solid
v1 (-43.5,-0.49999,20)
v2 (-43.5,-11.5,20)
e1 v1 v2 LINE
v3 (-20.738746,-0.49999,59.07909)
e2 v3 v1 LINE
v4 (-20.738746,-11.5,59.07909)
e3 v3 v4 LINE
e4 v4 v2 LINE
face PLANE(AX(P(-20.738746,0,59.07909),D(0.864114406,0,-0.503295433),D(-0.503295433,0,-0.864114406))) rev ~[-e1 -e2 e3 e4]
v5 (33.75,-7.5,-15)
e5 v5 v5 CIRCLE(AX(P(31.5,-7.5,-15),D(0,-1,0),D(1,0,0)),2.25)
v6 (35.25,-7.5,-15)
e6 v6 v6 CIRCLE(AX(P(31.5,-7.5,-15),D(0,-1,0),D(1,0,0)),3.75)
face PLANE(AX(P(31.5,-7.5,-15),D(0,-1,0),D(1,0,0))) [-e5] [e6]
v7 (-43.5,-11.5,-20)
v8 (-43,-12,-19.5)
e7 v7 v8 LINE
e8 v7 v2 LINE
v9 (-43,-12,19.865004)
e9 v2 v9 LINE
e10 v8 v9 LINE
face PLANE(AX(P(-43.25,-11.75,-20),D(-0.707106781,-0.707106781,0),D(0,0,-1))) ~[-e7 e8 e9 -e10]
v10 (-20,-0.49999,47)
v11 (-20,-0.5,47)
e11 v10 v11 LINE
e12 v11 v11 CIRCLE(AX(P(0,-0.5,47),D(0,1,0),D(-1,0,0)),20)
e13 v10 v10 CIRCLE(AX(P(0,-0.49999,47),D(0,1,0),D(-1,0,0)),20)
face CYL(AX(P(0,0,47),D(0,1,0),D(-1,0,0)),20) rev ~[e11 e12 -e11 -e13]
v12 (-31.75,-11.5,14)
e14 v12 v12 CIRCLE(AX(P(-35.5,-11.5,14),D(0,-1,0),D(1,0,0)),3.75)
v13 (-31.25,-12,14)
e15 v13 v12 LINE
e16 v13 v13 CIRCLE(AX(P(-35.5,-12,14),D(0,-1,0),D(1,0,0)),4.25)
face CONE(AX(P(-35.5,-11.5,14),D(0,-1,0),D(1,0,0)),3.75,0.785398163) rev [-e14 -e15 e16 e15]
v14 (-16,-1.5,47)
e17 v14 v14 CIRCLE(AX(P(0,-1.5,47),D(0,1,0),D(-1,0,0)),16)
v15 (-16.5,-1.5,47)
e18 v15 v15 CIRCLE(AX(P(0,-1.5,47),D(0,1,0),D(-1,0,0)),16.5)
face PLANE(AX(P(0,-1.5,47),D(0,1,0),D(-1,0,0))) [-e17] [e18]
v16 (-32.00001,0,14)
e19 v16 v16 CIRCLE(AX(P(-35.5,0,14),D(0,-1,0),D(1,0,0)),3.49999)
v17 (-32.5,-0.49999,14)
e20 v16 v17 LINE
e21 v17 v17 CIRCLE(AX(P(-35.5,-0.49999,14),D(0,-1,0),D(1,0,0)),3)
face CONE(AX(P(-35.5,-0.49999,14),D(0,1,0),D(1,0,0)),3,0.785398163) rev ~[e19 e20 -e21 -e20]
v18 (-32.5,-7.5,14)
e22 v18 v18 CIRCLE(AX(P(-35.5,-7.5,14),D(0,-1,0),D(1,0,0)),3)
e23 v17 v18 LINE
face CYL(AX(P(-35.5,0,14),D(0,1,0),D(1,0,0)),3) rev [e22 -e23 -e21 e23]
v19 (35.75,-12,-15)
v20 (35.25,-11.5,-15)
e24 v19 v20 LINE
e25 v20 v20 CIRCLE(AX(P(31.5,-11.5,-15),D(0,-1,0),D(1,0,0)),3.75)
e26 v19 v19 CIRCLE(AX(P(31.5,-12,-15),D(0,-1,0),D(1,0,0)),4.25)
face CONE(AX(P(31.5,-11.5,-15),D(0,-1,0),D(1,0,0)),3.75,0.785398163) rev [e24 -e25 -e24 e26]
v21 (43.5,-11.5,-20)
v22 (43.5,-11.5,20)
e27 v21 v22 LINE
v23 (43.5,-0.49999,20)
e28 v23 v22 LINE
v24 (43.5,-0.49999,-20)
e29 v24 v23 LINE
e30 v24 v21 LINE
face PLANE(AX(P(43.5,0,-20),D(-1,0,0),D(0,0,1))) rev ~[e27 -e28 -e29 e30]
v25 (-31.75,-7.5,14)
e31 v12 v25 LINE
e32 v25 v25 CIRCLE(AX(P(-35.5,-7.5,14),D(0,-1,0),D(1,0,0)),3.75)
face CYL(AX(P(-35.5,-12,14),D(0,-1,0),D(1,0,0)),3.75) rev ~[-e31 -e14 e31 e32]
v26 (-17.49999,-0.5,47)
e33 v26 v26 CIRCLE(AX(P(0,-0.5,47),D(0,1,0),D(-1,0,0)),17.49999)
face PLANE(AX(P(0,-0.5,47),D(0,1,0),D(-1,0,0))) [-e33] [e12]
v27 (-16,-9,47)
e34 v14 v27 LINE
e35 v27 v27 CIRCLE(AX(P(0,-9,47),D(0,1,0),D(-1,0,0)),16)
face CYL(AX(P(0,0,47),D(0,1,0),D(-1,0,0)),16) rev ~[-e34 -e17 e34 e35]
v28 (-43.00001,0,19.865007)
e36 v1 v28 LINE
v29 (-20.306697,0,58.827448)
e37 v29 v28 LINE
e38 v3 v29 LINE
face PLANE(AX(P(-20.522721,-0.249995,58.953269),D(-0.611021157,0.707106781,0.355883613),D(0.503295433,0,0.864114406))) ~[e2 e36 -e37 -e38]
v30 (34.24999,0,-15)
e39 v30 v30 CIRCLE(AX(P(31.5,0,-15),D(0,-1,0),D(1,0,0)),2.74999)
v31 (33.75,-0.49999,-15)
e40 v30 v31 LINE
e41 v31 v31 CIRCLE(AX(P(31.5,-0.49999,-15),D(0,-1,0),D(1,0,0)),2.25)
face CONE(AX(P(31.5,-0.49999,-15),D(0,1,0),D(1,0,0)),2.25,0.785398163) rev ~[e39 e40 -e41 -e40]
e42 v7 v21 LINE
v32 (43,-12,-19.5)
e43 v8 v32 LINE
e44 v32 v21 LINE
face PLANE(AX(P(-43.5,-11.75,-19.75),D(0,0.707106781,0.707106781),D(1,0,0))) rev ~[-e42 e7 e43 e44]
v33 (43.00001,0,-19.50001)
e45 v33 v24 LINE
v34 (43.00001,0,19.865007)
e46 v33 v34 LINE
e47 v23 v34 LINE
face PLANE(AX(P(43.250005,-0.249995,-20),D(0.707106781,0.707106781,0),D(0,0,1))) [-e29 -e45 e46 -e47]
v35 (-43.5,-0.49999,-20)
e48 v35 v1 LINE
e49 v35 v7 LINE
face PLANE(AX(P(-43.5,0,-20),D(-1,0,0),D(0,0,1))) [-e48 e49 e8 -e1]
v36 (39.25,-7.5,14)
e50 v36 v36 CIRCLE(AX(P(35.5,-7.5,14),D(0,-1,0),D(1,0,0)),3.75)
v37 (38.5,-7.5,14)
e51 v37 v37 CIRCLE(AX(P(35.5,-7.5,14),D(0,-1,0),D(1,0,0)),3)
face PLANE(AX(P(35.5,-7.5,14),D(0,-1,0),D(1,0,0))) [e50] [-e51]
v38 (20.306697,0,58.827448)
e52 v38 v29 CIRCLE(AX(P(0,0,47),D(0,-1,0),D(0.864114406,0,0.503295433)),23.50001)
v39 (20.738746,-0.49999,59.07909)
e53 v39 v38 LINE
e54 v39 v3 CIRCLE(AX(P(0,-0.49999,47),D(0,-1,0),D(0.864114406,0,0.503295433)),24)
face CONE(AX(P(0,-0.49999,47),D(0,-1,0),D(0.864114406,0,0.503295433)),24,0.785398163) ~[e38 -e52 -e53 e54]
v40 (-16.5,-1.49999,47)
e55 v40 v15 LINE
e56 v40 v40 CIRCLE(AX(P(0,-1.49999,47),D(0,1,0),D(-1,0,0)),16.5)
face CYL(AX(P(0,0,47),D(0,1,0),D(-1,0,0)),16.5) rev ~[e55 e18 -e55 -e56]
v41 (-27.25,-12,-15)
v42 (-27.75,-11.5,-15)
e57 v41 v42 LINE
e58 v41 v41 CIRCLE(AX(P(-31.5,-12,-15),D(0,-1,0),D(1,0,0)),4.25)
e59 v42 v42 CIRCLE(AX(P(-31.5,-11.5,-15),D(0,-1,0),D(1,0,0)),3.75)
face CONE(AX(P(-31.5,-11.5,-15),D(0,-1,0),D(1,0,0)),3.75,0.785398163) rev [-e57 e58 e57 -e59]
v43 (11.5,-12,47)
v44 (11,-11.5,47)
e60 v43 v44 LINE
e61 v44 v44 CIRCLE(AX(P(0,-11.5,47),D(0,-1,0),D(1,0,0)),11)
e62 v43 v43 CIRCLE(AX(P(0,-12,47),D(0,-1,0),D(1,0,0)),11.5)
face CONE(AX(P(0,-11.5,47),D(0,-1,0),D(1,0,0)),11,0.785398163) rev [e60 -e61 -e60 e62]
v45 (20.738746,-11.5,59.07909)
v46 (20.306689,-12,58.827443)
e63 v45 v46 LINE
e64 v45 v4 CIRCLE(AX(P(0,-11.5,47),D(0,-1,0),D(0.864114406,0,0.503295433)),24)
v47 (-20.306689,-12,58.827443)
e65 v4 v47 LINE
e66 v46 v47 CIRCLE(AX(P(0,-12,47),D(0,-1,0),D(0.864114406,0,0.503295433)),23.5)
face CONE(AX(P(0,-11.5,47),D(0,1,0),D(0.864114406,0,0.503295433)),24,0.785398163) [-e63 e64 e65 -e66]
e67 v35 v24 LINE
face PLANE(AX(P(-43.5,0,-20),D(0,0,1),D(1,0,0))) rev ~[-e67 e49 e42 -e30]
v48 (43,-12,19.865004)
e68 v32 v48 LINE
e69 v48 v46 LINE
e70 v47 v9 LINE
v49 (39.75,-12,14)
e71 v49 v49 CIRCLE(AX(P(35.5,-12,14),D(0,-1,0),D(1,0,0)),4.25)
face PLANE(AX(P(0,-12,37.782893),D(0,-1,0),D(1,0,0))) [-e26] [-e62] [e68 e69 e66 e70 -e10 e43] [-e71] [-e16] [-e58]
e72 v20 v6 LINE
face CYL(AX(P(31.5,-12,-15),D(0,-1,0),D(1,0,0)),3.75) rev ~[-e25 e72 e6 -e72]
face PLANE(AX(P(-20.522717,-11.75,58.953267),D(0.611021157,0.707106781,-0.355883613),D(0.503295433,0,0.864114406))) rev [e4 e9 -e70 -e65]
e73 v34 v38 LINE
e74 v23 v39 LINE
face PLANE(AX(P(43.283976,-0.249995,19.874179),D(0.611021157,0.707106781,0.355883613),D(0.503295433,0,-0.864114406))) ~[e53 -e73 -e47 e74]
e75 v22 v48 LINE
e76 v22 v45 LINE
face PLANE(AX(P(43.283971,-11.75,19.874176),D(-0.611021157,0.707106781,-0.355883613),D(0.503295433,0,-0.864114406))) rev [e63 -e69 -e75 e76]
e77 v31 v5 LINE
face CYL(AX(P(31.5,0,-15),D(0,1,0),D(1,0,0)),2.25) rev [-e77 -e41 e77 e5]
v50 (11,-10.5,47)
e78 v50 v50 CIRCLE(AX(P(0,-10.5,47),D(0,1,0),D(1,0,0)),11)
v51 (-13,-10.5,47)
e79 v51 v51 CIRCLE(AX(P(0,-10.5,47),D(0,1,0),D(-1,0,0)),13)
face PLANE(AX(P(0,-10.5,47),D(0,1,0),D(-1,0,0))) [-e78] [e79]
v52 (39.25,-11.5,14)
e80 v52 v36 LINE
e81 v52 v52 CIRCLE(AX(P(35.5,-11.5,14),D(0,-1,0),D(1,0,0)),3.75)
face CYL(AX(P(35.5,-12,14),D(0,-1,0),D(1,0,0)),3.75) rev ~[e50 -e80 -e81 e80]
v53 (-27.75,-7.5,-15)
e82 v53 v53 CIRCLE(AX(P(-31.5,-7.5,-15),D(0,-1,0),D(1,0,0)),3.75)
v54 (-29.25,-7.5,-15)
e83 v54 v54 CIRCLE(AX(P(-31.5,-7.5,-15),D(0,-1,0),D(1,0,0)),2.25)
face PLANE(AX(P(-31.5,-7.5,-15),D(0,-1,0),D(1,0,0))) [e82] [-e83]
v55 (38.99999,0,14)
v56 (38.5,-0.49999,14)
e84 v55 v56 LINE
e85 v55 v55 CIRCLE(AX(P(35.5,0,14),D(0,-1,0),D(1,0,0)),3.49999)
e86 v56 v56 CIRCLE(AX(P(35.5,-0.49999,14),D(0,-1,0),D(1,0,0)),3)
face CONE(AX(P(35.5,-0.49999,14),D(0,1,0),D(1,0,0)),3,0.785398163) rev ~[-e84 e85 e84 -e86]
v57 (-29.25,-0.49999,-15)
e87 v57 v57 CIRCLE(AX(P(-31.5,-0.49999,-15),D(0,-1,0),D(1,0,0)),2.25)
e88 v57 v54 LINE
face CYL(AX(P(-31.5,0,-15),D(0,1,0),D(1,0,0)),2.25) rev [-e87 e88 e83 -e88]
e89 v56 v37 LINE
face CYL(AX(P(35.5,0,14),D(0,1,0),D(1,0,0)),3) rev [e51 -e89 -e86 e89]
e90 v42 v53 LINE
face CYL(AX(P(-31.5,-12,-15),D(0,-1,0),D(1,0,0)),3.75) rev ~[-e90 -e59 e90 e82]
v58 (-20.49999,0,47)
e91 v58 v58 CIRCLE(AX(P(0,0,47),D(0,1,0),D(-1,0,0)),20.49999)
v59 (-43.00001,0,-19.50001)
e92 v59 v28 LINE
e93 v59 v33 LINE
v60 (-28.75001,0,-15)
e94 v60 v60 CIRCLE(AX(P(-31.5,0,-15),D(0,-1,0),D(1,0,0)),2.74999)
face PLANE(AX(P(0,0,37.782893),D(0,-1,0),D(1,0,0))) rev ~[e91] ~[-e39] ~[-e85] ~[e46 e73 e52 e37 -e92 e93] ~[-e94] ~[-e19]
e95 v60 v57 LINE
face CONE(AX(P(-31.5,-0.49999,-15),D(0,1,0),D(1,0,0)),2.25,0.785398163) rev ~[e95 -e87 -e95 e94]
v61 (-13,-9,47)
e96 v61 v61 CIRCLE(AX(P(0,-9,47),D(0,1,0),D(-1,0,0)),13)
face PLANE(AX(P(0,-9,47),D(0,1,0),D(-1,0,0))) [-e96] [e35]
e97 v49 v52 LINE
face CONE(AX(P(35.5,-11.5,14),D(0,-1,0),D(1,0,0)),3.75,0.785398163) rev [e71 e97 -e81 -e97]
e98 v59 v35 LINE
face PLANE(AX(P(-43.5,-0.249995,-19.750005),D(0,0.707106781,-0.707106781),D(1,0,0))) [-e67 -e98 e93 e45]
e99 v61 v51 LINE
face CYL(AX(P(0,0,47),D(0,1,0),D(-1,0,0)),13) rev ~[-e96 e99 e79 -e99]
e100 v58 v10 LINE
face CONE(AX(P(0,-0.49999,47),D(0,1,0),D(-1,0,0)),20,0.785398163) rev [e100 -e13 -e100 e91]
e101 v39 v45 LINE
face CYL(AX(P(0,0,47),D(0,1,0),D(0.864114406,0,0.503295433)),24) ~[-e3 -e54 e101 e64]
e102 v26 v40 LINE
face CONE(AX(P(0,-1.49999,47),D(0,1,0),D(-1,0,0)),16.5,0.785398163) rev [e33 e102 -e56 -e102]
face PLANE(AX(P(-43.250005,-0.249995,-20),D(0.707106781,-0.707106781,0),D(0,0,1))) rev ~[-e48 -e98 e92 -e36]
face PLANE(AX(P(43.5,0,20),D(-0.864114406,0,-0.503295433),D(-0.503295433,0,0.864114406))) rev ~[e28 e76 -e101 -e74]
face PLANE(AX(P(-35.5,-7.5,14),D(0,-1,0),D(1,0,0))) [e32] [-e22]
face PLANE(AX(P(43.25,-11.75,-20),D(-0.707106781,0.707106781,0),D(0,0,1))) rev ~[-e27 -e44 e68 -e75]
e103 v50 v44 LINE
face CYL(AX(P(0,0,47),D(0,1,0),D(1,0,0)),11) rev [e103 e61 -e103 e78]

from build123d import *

# Parameters (mm, degrees)
F0_R      = 11
F0_W      = 87
F0_H      = 40
F0_R_2    = 3.75
F0_R_3    = 3
F0_R_4    = 2.25
F1_DEPTH  = 12
F2_R      = 3.75
F2_R_2    = 3
F2_R_3    = 2.25
F3_DEPTH  = 4.5
F4_R      = 20
F5_DEPTH  = 0.5
F6_R      = 16.5
F7_DEPTH  = 1.5
F8_R      = 16
F9_DEPTH  = 9
F10_R     = 13
F11_DEPTH = 10.5
F12_SIZE2 = 0.5
F12_SIZE  = 0.5
F13_SIZE2 = 0.49999
F13_SIZE  = 0.49999
F14_SIZE2 = 0.99999
F14_SIZE  = 0.99999


# Not quite as in the source:
# - a fillet or chamfer is up to 0.001 mm smaller than in the source, because OpenCascade refuses the exact size


with BuildPart() as f1:
    # F0 (on Front) → F1 (new body)
    with BuildSketch(Plane.XZ):
        with BuildLine():
            Line((-43.5, 20), (43.5, 20))
            Line((43.5, 20), (20.7387457553, 59.0790903836))
            ThreePointArc((20.7387457553, 59.0790903836), (0, 71), (-20.7387457553, 59.0790903836))
            Line((-20.7387457553, 59.0790903836), (-43.5, 20))
        make_face()
        with Locations((0, 47)):
            Circle(F0_R, mode=Mode.SUBTRACT)
        Rectangle(F0_W, F0_H)
        with Locations((-31.5, -15)):
            Circle(F0_R_2, mode=Mode.SUBTRACT)
        with Locations((-35.5, 14)):
            Circle(F0_R_2, mode=Mode.SUBTRACT)
        with Locations((31.5, -15)):
            Circle(F0_R_2, mode=Mode.SUBTRACT)
        with Locations((35.5, 14)):
            Circle(F0_R_2, mode=Mode.SUBTRACT)
        with Locations((-35.5, 14)):
            Circle(F0_R_2)
        with Locations((-35.5, 14)):
            Circle(F0_R_3, mode=Mode.SUBTRACT)
        with Locations((-31.5, -15)):
            Circle(F0_R_2)
        with Locations((-31.5, -15)):
            Circle(F0_R_4, mode=Mode.SUBTRACT)
        with Locations((35.5, 14)):
            Circle(F0_R_2)
        with Locations((35.5, 14)):
            Circle(F0_R_3, mode=Mode.SUBTRACT)
        with Locations((31.5, -15)):
            Circle(F0_R_2)
        with Locations((31.5, -15)):
            Circle(F0_R_4, mode=Mode.SUBTRACT)
    extrude(amount=F1_DEPTH)

    # F2 (on face) → F3 (cut)
    with BuildSketch(Plane.XZ.offset(12)):
        with Locations((-35.5, 14)):
            Circle(F2_R)
        with Locations((-35.5, 14)):
            Circle(F2_R_2, mode=Mode.SUBTRACT)
        with Locations((35.5, 14)):
            Circle(F2_R)
        with Locations((35.5, 14)):
            Circle(F2_R_2, mode=Mode.SUBTRACT)
        with Locations((-31.5, -15)):
            Circle(F2_R)
        with Locations((-31.5, -15)):
            Circle(F2_R_3, mode=Mode.SUBTRACT)
        with Locations((31.5, -15)):
            Circle(F2_R)
        with Locations((31.5, -15)):
            Circle(F2_R_3, mode=Mode.SUBTRACT)
    extrude(amount=-F3_DEPTH, mode=Mode.SUBTRACT)

    # F4 (on face) → F5 (cut)
    with BuildSketch(Plane(origin=(0, 0, 0), x_dir=(-1, 0, 0), z_dir=(0, 1, 0))):
        with Locations((0, 47)):
            Circle(F4_R)
    extrude(amount=-F5_DEPTH, mode=Mode.SUBTRACT)

    # F6 (on face) → F7 (cut)
    with BuildSketch(Plane(origin=(0, 0, 0), x_dir=(-1, 0, 0), z_dir=(0, 1, 0))):
        with Locations((0, 47)):
            Circle(F6_R)
    extrude(amount=-F7_DEPTH, mode=Mode.SUBTRACT)

    # F8 (on face) → F9 (cut)
    with BuildSketch(Plane(origin=(0, 0, 0), x_dir=(-1, 0, 0), z_dir=(0, 1, 0))):
        with Locations((0, 47)):
            Circle(F8_R)
    extrude(amount=-F9_DEPTH, mode=Mode.SUBTRACT)

    # F10 (on face) → F11 (cut)
    with BuildSketch(Plane(origin=(0, 0, 0), x_dir=(-1, 0, 0), z_dir=(0, 1, 0))):
        with Locations((0, 47)):
            Circle(F10_R)
    extrude(amount=-F11_DEPTH, mode=Mode.SUBTRACT)

    # F12
    f12_edges = [f1.edges().sort_by_distance(p)[0] for p in [
        (-32.119373, -12, 39.539545),
        (0, -12, 71),
        (-43.5, -12, 0),
        (32.119373, -12, 39.539545),
        (0, -12, -20),
        (43.5, -12, 0),
        (-35.25, -12, -15),
        (-39.25, -12, 14),
        (27.75, -12, -15),
        (31.75, -12, 14),
        (-11, -12, 47),
    ]]
    chamfer(f12_edges, length=F12_SIZE, length2=F12_SIZE2)

    # F13 (size 0.5 and 0.5 in the source; OpenCascade refuses exactly that, so slightly less here)
    f13_edges = [f1.edges().sort_by_distance(p)[0] for p in [
        (-32.119373, 0, 39.539545),
        (0, 0, 71),
        (-43.5, 0, 0),
        (32.119373, 0, 39.539545),
        (0, 0, -20),
        (43.5, 0, 0),
        (-33.75, 0, -15),
        (-38.5, 0, 14),
        (29.25, 0, -15),
        (32.5, 0, 14),
        (20, 0, 47),
    ]]
    chamfer(f13_edges, length=F13_SIZE, length2=F13_SIZE2)

    # F14 (size 1 and 1 in the source; OpenCascade refuses exactly that, so slightly less here)
    f14_edges = [f1.edges().sort_by_distance(p)[0] for p in [
        (16.5, -0.5, 47),
    ]]
    chamfer(f14_edges, length=F14_SIZE, length2=F14_SIZE2)


solid = f1.part
